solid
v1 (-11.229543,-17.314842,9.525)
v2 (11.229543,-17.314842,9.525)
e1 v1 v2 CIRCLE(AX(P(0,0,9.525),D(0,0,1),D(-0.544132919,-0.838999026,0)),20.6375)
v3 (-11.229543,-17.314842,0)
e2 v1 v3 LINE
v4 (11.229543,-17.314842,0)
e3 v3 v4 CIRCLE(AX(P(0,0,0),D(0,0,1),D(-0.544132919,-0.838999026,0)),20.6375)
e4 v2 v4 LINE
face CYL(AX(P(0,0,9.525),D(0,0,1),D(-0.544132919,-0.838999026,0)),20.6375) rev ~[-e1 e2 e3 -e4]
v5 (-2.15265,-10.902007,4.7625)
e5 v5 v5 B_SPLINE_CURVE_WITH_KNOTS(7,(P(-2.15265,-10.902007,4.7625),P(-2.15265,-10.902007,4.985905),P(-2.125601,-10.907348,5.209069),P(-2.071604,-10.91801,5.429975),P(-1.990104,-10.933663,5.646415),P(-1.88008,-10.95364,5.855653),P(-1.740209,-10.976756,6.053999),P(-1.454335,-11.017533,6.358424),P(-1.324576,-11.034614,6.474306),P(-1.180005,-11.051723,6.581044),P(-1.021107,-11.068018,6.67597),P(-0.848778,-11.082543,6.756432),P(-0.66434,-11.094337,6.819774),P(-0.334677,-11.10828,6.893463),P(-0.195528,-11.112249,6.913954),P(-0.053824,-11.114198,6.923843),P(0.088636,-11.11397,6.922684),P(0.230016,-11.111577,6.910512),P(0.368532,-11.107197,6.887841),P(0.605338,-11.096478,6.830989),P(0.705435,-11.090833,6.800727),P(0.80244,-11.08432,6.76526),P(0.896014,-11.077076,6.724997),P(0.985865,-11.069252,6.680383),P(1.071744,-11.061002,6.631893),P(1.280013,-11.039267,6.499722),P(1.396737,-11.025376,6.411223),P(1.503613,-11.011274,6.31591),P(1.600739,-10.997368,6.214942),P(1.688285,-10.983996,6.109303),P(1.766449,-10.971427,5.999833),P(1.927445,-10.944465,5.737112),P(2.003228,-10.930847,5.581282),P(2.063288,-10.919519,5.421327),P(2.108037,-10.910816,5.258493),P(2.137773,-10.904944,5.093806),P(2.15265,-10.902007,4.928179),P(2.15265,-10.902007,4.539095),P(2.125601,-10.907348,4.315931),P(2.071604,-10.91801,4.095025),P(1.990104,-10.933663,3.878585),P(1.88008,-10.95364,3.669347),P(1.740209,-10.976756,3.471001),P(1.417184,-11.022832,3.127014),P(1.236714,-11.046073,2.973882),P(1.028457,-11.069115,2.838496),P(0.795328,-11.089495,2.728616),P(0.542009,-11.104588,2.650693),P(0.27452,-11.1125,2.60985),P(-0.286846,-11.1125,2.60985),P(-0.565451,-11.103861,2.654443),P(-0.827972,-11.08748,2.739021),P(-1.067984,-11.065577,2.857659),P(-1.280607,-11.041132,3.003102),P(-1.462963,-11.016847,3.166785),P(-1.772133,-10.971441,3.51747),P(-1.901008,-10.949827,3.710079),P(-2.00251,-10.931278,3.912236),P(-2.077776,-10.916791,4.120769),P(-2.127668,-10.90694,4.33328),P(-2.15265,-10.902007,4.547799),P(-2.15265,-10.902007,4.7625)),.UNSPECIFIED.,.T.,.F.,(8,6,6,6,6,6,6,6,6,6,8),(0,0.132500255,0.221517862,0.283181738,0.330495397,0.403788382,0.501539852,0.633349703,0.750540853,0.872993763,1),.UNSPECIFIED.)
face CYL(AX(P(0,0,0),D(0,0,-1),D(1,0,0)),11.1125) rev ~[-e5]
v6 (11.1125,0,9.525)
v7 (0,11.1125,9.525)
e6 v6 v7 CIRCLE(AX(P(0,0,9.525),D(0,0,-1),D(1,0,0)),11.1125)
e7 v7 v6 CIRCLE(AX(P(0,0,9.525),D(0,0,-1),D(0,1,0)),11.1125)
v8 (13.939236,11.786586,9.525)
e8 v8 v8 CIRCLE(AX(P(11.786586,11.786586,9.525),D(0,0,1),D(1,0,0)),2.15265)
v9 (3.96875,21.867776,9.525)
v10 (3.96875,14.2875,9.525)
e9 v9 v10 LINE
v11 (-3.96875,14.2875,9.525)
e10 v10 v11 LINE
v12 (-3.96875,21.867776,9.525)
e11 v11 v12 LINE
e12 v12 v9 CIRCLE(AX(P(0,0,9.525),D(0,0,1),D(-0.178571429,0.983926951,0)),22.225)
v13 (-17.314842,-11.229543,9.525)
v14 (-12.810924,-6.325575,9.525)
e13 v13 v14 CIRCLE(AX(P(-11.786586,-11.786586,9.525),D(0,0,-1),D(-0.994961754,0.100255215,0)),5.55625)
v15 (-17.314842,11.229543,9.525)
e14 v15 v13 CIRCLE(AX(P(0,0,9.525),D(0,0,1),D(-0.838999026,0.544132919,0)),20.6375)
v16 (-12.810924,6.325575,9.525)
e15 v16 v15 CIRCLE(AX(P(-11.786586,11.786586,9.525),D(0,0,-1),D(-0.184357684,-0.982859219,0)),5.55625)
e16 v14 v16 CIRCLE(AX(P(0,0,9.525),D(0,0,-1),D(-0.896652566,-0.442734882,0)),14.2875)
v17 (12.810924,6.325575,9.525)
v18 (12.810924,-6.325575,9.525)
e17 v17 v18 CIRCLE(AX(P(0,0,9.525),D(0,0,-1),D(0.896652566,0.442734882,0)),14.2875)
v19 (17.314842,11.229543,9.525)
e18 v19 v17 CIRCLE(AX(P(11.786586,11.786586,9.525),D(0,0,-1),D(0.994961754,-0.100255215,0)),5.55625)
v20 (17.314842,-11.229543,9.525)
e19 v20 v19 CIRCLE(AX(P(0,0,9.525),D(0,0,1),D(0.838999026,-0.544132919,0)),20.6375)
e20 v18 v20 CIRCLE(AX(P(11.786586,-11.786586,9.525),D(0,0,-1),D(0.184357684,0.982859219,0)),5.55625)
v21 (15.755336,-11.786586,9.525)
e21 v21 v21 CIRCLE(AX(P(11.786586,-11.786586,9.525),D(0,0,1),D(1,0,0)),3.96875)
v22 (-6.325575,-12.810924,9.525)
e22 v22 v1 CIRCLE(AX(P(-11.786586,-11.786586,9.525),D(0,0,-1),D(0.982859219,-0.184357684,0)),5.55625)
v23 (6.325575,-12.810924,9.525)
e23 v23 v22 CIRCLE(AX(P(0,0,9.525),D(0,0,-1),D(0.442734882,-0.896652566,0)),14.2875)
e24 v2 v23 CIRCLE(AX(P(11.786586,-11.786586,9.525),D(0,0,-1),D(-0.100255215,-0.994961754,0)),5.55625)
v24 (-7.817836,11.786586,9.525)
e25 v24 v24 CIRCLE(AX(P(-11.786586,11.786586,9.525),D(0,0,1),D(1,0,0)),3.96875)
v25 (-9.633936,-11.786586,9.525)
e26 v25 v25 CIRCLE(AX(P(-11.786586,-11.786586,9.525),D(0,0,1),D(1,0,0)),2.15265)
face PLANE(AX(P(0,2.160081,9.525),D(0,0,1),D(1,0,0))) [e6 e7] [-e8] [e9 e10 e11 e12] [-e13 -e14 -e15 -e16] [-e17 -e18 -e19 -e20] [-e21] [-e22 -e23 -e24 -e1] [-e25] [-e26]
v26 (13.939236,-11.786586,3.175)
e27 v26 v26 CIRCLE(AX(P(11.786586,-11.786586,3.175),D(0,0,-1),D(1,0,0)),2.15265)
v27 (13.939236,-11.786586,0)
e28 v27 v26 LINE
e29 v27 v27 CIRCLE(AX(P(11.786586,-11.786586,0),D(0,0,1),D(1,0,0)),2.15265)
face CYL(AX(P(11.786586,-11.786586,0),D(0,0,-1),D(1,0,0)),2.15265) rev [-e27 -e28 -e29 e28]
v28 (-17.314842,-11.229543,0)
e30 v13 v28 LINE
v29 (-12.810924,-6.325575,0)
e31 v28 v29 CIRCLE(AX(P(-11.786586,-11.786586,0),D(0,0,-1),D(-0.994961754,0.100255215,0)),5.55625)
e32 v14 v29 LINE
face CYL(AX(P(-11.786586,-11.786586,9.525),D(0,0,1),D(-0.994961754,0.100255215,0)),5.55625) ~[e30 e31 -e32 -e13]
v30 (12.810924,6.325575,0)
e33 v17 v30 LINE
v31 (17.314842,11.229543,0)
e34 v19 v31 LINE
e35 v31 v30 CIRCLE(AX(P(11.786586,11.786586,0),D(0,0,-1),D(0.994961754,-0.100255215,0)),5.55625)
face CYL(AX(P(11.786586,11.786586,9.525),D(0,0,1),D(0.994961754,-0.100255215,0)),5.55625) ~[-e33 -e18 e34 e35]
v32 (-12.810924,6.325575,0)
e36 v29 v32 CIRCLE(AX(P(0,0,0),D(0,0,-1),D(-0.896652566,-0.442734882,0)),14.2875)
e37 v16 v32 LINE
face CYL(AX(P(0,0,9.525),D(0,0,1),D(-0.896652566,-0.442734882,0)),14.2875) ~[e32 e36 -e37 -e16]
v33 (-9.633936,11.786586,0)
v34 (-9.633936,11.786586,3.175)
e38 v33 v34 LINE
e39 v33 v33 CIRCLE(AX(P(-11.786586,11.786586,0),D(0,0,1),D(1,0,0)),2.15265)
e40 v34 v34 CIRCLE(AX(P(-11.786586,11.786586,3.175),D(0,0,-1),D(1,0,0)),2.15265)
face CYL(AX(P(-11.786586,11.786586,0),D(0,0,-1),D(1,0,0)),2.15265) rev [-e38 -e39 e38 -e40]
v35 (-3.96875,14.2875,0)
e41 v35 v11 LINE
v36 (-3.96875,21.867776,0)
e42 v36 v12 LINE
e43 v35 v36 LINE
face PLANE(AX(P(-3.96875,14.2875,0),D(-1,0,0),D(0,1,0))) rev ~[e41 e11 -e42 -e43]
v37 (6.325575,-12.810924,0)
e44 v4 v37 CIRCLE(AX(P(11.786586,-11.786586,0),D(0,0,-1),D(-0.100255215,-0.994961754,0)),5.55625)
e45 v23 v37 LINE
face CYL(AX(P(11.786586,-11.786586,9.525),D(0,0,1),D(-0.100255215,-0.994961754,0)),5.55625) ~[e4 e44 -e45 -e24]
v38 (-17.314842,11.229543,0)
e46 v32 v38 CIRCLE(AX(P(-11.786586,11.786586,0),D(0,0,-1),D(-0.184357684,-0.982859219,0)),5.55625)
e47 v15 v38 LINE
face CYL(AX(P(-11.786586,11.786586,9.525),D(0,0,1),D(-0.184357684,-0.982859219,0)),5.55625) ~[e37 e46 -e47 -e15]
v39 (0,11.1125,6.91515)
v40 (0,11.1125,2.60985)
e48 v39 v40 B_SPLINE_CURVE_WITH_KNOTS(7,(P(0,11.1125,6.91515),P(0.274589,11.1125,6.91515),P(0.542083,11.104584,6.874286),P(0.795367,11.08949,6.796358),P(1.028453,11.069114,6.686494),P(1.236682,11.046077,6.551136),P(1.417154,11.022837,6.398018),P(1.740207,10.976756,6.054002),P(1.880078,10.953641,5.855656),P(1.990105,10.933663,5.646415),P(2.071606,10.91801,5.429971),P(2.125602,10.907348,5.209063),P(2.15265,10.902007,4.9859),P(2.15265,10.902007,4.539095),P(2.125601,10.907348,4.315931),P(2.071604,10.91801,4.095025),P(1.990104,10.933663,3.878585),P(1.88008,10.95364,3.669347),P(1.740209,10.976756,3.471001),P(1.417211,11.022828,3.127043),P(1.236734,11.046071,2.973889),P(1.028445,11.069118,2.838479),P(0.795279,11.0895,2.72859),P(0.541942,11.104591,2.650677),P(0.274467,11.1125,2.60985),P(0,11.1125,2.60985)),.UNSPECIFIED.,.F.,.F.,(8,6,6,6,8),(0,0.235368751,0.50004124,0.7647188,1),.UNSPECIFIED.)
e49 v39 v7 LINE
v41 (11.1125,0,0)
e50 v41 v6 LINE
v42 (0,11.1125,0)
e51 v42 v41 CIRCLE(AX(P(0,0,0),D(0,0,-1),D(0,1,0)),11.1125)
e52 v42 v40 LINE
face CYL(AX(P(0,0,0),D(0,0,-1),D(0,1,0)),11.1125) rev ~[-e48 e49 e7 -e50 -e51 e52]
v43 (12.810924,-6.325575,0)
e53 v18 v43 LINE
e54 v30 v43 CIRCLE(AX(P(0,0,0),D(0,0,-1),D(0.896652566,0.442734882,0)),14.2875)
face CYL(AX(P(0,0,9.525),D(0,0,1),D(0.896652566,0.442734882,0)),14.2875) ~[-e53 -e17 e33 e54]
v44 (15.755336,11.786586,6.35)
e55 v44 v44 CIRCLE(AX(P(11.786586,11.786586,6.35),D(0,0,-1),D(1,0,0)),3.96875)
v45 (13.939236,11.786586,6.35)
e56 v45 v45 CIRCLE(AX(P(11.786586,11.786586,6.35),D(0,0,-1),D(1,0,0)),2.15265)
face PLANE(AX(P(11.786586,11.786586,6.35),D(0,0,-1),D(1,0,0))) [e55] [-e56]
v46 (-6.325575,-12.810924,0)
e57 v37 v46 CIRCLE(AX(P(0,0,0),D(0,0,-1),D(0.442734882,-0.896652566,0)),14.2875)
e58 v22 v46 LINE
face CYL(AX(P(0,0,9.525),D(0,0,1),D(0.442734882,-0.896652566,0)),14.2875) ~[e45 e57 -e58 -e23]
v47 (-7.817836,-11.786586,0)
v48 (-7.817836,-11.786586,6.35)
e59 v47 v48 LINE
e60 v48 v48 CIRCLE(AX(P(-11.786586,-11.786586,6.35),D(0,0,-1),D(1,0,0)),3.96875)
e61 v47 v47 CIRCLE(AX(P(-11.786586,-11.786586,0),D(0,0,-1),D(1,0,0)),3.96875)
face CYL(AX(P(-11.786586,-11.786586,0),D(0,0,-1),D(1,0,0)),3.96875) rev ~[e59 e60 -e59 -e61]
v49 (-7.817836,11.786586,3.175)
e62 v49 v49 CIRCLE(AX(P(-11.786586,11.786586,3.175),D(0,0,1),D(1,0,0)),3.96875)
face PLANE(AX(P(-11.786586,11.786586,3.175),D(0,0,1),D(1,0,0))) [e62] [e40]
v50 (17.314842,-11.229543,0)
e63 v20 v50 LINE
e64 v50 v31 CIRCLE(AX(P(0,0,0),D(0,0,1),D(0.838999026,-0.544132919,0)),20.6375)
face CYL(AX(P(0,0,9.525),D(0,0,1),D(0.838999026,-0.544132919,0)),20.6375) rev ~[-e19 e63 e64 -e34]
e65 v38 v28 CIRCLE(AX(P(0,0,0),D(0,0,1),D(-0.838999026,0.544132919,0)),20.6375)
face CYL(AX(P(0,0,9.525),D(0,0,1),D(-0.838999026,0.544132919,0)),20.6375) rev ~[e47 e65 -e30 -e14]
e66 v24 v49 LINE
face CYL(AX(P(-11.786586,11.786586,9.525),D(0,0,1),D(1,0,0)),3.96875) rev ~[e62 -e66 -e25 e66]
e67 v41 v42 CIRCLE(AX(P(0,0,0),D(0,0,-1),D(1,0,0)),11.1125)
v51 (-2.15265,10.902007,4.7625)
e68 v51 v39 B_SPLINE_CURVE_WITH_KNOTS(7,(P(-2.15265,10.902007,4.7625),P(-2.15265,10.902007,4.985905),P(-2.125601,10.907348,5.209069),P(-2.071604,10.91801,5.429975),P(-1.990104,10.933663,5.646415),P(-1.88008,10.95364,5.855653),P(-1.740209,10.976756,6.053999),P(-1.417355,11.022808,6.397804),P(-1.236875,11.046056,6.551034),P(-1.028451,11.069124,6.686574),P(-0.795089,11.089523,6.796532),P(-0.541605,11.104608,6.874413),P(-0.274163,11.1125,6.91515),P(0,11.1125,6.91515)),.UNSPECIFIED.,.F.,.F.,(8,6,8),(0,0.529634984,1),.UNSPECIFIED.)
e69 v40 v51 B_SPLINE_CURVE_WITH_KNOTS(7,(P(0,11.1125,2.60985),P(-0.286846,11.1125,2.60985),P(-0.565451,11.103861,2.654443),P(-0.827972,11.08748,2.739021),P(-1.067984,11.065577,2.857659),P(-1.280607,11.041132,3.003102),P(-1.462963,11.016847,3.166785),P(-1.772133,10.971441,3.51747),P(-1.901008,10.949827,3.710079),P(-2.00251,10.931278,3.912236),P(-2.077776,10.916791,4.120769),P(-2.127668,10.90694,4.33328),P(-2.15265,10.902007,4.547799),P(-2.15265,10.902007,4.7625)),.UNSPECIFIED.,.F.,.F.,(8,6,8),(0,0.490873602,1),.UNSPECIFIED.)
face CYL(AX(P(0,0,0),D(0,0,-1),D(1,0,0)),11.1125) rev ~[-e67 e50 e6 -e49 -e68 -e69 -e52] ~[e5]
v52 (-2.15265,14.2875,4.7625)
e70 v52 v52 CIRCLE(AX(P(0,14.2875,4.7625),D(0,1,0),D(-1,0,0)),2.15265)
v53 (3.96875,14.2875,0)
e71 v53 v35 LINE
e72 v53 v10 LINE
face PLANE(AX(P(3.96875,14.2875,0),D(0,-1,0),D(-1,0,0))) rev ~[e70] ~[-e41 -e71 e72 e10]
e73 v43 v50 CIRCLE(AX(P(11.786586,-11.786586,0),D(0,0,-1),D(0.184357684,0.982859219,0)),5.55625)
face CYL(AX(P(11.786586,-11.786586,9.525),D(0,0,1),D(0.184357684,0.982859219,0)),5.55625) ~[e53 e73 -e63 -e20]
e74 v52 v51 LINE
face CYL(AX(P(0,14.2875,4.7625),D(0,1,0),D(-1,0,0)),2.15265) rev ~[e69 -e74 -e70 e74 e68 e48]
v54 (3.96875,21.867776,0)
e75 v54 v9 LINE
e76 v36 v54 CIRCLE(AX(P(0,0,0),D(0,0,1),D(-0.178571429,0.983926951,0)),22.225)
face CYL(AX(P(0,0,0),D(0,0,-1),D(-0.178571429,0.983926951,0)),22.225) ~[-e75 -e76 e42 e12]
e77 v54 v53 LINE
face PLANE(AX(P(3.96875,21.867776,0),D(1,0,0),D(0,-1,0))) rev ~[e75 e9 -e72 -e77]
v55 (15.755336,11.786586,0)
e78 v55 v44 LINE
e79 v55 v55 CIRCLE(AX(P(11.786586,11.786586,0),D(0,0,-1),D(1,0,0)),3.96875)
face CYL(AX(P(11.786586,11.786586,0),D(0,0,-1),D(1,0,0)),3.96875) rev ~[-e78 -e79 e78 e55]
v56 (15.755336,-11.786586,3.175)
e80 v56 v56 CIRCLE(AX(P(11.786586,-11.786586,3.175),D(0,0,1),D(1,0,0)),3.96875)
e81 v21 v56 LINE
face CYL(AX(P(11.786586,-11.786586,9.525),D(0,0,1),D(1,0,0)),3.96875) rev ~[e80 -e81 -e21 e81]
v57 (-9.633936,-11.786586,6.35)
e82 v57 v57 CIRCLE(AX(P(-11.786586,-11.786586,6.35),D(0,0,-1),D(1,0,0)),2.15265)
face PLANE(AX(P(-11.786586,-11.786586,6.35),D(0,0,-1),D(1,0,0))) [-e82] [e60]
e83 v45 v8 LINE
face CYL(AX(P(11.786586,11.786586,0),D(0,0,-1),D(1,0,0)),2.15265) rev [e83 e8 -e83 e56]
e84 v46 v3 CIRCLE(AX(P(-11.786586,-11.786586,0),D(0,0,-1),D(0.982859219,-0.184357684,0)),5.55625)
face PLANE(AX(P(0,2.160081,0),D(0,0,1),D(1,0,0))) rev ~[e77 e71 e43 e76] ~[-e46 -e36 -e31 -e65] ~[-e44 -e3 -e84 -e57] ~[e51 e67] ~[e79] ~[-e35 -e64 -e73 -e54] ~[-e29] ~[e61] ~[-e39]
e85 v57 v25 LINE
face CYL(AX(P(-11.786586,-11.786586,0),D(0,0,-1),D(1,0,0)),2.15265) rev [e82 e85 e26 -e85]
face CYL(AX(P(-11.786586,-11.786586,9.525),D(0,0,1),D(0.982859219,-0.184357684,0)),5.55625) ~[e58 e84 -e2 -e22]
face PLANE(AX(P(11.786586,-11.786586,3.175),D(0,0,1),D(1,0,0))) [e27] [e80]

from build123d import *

# Parameters (mm, degrees)
F0_R             = 2.15265
F1_DEPTH         = 9.525
F2_R             = 2.15265
F3_REACH         = 42.6021136501
F6_R             = 3.96875
F7_DEPTH         = 6.35
F8_R             = 3.96875
F9_DEPTH         = 6.35
F11_DEPTH        = 9.525
F11_COPIES_COUNT = 3
F11_COPIES_ANGLE = 180


# Not quite as in the source:
# - a pattern or mirror of a feature is missing from the dataset's text; its kind, count and spacing are read off the source's solid


with BuildPart() as f1:
    # F0 (on Top) → F1 (new body)
    with BuildSketch(Plane.XY):
        with BuildLine():
            Line((3.96875, 14.2875), (0, 14.2875))
            Line((0, 14.2875), (-3.96875, 14.2875))
            Line((-3.96875, 14.2875), (-3.96875, 21.8677764859))
            ThreePointArc((-3.96875, 21.8677764859), (0, -22.225), (3.96875, 21.8677764859))
            Line((3.96875, 21.8677764859), (3.96875, 14.2875))
        make_face()
        with Locations((-11.7865861589, -11.7865861589)):
            Circle(F0_R, mode=Mode.SUBTRACT)
        with Locations((11.7865861589, -11.7865861589)):
            Circle(F0_R, mode=Mode.SUBTRACT)
        with Locations((-11.7865861589, 11.7865861589)):
            Circle(F0_R, mode=Mode.SUBTRACT)
        with BuildLine():
            ThreePointArc((0, 11.1125), (7.8577241059, 7.8577241059), (11.1125, 0))
            ThreePointArc((11.1125, 0), (-7.8577241059, -7.8577241059), (0, 11.1125))
        make_face(mode=Mode.SUBTRACT)
        with Locations((11.7865861589, 11.7865861589)):
            Circle(F0_R, mode=Mode.SUBTRACT)
    extrude(amount=F1_DEPTH)

    f3_end = f1.faces().sort_by_distance((0, -11.1125, 4.7625))[0]
    # F2 (on face) → F3 (cut, up to a face of the model that its end follows)
    with BuildSketch(Plane(origin=(0, 14.2875, 0), x_dir=(-1, 0, 0), z_dir=(0, 1, 0))):
        with Locations((0, 4.7625)):
            Circle(F2_R)
    f3_long = extrude(amount=-F3_REACH, mode=Mode.PRIVATE)
    add(split(f3_long, bisect_by=f3_end, keep=Keep.ALL, mode=Mode.PRIVATE).solids().sort_by_distance((0, 14.2875, 4.7625))[0], mode=Mode.SUBTRACT)

    # F6 (on face) → F7 (cut, through all)
    with BuildSketch(Plane.XY.offset(9.525)):
        with Locations((-11.7865861589, 11.7865861589)):
            Circle(F6_R)
        with Locations((11.7865861589, -11.7865861589)):
            Circle(F6_R)
    extrude(amount=-F7_DEPTH, mode=Mode.SUBTRACT)

    # F8 (on face) → F9 (cut, through all)
    with BuildSketch(Plane(origin=(0, 0, 0), x_dir=(1, 0, 0), z_dir=(0, 0, -1))):
        with Locations((11.7865861589, -11.7865861589)):
            Circle(F8_R)
        with Locations((-11.7865861589, 11.7865861589)):
            Circle(F8_R)
    extrude(amount=-F9_DEPTH, mode=Mode.SUBTRACT)

    # F10 (on face) → F11 (cut, through all)
    with BuildSketch(Plane.XY.offset(9.525)):
        with BuildLine():
            ThreePointArc((-12.8109235396, -6.3255746232), (-14.2875, 0), (-12.8109235396, 6.3255746232))
            ThreePointArc((-12.8109235396, 6.3255746232), (-15.8788163052, 8.0281867), (-17.3148424047, 11.229543123))
            ThreePointArc((-17.3148424047, 11.229543123), (-20.6375, 0), (-17.3148424047, -11.229543123))
            ThreePointArc((-17.3148424047, -11.229543123), (-15.8788163052, -8.0281867), (-12.8109235396, -6.3255746232))
        make_face()
    f11 = extrude(amount=-F11_DEPTH, mode=Mode.SUBTRACT)

    # F11_copies: F11 ×3 about axis
    f11_copies_axis = Axis((0, 0, 0), (0, 0, 1))
    for i in range(1, F11_COPIES_COUNT):
        add(f11.rotate(f11_copies_axis, i * F11_COPIES_ANGLE / (F11_COPIES_COUNT - 1)), mode=Mode.SUBTRACT)


solid = f1.part
